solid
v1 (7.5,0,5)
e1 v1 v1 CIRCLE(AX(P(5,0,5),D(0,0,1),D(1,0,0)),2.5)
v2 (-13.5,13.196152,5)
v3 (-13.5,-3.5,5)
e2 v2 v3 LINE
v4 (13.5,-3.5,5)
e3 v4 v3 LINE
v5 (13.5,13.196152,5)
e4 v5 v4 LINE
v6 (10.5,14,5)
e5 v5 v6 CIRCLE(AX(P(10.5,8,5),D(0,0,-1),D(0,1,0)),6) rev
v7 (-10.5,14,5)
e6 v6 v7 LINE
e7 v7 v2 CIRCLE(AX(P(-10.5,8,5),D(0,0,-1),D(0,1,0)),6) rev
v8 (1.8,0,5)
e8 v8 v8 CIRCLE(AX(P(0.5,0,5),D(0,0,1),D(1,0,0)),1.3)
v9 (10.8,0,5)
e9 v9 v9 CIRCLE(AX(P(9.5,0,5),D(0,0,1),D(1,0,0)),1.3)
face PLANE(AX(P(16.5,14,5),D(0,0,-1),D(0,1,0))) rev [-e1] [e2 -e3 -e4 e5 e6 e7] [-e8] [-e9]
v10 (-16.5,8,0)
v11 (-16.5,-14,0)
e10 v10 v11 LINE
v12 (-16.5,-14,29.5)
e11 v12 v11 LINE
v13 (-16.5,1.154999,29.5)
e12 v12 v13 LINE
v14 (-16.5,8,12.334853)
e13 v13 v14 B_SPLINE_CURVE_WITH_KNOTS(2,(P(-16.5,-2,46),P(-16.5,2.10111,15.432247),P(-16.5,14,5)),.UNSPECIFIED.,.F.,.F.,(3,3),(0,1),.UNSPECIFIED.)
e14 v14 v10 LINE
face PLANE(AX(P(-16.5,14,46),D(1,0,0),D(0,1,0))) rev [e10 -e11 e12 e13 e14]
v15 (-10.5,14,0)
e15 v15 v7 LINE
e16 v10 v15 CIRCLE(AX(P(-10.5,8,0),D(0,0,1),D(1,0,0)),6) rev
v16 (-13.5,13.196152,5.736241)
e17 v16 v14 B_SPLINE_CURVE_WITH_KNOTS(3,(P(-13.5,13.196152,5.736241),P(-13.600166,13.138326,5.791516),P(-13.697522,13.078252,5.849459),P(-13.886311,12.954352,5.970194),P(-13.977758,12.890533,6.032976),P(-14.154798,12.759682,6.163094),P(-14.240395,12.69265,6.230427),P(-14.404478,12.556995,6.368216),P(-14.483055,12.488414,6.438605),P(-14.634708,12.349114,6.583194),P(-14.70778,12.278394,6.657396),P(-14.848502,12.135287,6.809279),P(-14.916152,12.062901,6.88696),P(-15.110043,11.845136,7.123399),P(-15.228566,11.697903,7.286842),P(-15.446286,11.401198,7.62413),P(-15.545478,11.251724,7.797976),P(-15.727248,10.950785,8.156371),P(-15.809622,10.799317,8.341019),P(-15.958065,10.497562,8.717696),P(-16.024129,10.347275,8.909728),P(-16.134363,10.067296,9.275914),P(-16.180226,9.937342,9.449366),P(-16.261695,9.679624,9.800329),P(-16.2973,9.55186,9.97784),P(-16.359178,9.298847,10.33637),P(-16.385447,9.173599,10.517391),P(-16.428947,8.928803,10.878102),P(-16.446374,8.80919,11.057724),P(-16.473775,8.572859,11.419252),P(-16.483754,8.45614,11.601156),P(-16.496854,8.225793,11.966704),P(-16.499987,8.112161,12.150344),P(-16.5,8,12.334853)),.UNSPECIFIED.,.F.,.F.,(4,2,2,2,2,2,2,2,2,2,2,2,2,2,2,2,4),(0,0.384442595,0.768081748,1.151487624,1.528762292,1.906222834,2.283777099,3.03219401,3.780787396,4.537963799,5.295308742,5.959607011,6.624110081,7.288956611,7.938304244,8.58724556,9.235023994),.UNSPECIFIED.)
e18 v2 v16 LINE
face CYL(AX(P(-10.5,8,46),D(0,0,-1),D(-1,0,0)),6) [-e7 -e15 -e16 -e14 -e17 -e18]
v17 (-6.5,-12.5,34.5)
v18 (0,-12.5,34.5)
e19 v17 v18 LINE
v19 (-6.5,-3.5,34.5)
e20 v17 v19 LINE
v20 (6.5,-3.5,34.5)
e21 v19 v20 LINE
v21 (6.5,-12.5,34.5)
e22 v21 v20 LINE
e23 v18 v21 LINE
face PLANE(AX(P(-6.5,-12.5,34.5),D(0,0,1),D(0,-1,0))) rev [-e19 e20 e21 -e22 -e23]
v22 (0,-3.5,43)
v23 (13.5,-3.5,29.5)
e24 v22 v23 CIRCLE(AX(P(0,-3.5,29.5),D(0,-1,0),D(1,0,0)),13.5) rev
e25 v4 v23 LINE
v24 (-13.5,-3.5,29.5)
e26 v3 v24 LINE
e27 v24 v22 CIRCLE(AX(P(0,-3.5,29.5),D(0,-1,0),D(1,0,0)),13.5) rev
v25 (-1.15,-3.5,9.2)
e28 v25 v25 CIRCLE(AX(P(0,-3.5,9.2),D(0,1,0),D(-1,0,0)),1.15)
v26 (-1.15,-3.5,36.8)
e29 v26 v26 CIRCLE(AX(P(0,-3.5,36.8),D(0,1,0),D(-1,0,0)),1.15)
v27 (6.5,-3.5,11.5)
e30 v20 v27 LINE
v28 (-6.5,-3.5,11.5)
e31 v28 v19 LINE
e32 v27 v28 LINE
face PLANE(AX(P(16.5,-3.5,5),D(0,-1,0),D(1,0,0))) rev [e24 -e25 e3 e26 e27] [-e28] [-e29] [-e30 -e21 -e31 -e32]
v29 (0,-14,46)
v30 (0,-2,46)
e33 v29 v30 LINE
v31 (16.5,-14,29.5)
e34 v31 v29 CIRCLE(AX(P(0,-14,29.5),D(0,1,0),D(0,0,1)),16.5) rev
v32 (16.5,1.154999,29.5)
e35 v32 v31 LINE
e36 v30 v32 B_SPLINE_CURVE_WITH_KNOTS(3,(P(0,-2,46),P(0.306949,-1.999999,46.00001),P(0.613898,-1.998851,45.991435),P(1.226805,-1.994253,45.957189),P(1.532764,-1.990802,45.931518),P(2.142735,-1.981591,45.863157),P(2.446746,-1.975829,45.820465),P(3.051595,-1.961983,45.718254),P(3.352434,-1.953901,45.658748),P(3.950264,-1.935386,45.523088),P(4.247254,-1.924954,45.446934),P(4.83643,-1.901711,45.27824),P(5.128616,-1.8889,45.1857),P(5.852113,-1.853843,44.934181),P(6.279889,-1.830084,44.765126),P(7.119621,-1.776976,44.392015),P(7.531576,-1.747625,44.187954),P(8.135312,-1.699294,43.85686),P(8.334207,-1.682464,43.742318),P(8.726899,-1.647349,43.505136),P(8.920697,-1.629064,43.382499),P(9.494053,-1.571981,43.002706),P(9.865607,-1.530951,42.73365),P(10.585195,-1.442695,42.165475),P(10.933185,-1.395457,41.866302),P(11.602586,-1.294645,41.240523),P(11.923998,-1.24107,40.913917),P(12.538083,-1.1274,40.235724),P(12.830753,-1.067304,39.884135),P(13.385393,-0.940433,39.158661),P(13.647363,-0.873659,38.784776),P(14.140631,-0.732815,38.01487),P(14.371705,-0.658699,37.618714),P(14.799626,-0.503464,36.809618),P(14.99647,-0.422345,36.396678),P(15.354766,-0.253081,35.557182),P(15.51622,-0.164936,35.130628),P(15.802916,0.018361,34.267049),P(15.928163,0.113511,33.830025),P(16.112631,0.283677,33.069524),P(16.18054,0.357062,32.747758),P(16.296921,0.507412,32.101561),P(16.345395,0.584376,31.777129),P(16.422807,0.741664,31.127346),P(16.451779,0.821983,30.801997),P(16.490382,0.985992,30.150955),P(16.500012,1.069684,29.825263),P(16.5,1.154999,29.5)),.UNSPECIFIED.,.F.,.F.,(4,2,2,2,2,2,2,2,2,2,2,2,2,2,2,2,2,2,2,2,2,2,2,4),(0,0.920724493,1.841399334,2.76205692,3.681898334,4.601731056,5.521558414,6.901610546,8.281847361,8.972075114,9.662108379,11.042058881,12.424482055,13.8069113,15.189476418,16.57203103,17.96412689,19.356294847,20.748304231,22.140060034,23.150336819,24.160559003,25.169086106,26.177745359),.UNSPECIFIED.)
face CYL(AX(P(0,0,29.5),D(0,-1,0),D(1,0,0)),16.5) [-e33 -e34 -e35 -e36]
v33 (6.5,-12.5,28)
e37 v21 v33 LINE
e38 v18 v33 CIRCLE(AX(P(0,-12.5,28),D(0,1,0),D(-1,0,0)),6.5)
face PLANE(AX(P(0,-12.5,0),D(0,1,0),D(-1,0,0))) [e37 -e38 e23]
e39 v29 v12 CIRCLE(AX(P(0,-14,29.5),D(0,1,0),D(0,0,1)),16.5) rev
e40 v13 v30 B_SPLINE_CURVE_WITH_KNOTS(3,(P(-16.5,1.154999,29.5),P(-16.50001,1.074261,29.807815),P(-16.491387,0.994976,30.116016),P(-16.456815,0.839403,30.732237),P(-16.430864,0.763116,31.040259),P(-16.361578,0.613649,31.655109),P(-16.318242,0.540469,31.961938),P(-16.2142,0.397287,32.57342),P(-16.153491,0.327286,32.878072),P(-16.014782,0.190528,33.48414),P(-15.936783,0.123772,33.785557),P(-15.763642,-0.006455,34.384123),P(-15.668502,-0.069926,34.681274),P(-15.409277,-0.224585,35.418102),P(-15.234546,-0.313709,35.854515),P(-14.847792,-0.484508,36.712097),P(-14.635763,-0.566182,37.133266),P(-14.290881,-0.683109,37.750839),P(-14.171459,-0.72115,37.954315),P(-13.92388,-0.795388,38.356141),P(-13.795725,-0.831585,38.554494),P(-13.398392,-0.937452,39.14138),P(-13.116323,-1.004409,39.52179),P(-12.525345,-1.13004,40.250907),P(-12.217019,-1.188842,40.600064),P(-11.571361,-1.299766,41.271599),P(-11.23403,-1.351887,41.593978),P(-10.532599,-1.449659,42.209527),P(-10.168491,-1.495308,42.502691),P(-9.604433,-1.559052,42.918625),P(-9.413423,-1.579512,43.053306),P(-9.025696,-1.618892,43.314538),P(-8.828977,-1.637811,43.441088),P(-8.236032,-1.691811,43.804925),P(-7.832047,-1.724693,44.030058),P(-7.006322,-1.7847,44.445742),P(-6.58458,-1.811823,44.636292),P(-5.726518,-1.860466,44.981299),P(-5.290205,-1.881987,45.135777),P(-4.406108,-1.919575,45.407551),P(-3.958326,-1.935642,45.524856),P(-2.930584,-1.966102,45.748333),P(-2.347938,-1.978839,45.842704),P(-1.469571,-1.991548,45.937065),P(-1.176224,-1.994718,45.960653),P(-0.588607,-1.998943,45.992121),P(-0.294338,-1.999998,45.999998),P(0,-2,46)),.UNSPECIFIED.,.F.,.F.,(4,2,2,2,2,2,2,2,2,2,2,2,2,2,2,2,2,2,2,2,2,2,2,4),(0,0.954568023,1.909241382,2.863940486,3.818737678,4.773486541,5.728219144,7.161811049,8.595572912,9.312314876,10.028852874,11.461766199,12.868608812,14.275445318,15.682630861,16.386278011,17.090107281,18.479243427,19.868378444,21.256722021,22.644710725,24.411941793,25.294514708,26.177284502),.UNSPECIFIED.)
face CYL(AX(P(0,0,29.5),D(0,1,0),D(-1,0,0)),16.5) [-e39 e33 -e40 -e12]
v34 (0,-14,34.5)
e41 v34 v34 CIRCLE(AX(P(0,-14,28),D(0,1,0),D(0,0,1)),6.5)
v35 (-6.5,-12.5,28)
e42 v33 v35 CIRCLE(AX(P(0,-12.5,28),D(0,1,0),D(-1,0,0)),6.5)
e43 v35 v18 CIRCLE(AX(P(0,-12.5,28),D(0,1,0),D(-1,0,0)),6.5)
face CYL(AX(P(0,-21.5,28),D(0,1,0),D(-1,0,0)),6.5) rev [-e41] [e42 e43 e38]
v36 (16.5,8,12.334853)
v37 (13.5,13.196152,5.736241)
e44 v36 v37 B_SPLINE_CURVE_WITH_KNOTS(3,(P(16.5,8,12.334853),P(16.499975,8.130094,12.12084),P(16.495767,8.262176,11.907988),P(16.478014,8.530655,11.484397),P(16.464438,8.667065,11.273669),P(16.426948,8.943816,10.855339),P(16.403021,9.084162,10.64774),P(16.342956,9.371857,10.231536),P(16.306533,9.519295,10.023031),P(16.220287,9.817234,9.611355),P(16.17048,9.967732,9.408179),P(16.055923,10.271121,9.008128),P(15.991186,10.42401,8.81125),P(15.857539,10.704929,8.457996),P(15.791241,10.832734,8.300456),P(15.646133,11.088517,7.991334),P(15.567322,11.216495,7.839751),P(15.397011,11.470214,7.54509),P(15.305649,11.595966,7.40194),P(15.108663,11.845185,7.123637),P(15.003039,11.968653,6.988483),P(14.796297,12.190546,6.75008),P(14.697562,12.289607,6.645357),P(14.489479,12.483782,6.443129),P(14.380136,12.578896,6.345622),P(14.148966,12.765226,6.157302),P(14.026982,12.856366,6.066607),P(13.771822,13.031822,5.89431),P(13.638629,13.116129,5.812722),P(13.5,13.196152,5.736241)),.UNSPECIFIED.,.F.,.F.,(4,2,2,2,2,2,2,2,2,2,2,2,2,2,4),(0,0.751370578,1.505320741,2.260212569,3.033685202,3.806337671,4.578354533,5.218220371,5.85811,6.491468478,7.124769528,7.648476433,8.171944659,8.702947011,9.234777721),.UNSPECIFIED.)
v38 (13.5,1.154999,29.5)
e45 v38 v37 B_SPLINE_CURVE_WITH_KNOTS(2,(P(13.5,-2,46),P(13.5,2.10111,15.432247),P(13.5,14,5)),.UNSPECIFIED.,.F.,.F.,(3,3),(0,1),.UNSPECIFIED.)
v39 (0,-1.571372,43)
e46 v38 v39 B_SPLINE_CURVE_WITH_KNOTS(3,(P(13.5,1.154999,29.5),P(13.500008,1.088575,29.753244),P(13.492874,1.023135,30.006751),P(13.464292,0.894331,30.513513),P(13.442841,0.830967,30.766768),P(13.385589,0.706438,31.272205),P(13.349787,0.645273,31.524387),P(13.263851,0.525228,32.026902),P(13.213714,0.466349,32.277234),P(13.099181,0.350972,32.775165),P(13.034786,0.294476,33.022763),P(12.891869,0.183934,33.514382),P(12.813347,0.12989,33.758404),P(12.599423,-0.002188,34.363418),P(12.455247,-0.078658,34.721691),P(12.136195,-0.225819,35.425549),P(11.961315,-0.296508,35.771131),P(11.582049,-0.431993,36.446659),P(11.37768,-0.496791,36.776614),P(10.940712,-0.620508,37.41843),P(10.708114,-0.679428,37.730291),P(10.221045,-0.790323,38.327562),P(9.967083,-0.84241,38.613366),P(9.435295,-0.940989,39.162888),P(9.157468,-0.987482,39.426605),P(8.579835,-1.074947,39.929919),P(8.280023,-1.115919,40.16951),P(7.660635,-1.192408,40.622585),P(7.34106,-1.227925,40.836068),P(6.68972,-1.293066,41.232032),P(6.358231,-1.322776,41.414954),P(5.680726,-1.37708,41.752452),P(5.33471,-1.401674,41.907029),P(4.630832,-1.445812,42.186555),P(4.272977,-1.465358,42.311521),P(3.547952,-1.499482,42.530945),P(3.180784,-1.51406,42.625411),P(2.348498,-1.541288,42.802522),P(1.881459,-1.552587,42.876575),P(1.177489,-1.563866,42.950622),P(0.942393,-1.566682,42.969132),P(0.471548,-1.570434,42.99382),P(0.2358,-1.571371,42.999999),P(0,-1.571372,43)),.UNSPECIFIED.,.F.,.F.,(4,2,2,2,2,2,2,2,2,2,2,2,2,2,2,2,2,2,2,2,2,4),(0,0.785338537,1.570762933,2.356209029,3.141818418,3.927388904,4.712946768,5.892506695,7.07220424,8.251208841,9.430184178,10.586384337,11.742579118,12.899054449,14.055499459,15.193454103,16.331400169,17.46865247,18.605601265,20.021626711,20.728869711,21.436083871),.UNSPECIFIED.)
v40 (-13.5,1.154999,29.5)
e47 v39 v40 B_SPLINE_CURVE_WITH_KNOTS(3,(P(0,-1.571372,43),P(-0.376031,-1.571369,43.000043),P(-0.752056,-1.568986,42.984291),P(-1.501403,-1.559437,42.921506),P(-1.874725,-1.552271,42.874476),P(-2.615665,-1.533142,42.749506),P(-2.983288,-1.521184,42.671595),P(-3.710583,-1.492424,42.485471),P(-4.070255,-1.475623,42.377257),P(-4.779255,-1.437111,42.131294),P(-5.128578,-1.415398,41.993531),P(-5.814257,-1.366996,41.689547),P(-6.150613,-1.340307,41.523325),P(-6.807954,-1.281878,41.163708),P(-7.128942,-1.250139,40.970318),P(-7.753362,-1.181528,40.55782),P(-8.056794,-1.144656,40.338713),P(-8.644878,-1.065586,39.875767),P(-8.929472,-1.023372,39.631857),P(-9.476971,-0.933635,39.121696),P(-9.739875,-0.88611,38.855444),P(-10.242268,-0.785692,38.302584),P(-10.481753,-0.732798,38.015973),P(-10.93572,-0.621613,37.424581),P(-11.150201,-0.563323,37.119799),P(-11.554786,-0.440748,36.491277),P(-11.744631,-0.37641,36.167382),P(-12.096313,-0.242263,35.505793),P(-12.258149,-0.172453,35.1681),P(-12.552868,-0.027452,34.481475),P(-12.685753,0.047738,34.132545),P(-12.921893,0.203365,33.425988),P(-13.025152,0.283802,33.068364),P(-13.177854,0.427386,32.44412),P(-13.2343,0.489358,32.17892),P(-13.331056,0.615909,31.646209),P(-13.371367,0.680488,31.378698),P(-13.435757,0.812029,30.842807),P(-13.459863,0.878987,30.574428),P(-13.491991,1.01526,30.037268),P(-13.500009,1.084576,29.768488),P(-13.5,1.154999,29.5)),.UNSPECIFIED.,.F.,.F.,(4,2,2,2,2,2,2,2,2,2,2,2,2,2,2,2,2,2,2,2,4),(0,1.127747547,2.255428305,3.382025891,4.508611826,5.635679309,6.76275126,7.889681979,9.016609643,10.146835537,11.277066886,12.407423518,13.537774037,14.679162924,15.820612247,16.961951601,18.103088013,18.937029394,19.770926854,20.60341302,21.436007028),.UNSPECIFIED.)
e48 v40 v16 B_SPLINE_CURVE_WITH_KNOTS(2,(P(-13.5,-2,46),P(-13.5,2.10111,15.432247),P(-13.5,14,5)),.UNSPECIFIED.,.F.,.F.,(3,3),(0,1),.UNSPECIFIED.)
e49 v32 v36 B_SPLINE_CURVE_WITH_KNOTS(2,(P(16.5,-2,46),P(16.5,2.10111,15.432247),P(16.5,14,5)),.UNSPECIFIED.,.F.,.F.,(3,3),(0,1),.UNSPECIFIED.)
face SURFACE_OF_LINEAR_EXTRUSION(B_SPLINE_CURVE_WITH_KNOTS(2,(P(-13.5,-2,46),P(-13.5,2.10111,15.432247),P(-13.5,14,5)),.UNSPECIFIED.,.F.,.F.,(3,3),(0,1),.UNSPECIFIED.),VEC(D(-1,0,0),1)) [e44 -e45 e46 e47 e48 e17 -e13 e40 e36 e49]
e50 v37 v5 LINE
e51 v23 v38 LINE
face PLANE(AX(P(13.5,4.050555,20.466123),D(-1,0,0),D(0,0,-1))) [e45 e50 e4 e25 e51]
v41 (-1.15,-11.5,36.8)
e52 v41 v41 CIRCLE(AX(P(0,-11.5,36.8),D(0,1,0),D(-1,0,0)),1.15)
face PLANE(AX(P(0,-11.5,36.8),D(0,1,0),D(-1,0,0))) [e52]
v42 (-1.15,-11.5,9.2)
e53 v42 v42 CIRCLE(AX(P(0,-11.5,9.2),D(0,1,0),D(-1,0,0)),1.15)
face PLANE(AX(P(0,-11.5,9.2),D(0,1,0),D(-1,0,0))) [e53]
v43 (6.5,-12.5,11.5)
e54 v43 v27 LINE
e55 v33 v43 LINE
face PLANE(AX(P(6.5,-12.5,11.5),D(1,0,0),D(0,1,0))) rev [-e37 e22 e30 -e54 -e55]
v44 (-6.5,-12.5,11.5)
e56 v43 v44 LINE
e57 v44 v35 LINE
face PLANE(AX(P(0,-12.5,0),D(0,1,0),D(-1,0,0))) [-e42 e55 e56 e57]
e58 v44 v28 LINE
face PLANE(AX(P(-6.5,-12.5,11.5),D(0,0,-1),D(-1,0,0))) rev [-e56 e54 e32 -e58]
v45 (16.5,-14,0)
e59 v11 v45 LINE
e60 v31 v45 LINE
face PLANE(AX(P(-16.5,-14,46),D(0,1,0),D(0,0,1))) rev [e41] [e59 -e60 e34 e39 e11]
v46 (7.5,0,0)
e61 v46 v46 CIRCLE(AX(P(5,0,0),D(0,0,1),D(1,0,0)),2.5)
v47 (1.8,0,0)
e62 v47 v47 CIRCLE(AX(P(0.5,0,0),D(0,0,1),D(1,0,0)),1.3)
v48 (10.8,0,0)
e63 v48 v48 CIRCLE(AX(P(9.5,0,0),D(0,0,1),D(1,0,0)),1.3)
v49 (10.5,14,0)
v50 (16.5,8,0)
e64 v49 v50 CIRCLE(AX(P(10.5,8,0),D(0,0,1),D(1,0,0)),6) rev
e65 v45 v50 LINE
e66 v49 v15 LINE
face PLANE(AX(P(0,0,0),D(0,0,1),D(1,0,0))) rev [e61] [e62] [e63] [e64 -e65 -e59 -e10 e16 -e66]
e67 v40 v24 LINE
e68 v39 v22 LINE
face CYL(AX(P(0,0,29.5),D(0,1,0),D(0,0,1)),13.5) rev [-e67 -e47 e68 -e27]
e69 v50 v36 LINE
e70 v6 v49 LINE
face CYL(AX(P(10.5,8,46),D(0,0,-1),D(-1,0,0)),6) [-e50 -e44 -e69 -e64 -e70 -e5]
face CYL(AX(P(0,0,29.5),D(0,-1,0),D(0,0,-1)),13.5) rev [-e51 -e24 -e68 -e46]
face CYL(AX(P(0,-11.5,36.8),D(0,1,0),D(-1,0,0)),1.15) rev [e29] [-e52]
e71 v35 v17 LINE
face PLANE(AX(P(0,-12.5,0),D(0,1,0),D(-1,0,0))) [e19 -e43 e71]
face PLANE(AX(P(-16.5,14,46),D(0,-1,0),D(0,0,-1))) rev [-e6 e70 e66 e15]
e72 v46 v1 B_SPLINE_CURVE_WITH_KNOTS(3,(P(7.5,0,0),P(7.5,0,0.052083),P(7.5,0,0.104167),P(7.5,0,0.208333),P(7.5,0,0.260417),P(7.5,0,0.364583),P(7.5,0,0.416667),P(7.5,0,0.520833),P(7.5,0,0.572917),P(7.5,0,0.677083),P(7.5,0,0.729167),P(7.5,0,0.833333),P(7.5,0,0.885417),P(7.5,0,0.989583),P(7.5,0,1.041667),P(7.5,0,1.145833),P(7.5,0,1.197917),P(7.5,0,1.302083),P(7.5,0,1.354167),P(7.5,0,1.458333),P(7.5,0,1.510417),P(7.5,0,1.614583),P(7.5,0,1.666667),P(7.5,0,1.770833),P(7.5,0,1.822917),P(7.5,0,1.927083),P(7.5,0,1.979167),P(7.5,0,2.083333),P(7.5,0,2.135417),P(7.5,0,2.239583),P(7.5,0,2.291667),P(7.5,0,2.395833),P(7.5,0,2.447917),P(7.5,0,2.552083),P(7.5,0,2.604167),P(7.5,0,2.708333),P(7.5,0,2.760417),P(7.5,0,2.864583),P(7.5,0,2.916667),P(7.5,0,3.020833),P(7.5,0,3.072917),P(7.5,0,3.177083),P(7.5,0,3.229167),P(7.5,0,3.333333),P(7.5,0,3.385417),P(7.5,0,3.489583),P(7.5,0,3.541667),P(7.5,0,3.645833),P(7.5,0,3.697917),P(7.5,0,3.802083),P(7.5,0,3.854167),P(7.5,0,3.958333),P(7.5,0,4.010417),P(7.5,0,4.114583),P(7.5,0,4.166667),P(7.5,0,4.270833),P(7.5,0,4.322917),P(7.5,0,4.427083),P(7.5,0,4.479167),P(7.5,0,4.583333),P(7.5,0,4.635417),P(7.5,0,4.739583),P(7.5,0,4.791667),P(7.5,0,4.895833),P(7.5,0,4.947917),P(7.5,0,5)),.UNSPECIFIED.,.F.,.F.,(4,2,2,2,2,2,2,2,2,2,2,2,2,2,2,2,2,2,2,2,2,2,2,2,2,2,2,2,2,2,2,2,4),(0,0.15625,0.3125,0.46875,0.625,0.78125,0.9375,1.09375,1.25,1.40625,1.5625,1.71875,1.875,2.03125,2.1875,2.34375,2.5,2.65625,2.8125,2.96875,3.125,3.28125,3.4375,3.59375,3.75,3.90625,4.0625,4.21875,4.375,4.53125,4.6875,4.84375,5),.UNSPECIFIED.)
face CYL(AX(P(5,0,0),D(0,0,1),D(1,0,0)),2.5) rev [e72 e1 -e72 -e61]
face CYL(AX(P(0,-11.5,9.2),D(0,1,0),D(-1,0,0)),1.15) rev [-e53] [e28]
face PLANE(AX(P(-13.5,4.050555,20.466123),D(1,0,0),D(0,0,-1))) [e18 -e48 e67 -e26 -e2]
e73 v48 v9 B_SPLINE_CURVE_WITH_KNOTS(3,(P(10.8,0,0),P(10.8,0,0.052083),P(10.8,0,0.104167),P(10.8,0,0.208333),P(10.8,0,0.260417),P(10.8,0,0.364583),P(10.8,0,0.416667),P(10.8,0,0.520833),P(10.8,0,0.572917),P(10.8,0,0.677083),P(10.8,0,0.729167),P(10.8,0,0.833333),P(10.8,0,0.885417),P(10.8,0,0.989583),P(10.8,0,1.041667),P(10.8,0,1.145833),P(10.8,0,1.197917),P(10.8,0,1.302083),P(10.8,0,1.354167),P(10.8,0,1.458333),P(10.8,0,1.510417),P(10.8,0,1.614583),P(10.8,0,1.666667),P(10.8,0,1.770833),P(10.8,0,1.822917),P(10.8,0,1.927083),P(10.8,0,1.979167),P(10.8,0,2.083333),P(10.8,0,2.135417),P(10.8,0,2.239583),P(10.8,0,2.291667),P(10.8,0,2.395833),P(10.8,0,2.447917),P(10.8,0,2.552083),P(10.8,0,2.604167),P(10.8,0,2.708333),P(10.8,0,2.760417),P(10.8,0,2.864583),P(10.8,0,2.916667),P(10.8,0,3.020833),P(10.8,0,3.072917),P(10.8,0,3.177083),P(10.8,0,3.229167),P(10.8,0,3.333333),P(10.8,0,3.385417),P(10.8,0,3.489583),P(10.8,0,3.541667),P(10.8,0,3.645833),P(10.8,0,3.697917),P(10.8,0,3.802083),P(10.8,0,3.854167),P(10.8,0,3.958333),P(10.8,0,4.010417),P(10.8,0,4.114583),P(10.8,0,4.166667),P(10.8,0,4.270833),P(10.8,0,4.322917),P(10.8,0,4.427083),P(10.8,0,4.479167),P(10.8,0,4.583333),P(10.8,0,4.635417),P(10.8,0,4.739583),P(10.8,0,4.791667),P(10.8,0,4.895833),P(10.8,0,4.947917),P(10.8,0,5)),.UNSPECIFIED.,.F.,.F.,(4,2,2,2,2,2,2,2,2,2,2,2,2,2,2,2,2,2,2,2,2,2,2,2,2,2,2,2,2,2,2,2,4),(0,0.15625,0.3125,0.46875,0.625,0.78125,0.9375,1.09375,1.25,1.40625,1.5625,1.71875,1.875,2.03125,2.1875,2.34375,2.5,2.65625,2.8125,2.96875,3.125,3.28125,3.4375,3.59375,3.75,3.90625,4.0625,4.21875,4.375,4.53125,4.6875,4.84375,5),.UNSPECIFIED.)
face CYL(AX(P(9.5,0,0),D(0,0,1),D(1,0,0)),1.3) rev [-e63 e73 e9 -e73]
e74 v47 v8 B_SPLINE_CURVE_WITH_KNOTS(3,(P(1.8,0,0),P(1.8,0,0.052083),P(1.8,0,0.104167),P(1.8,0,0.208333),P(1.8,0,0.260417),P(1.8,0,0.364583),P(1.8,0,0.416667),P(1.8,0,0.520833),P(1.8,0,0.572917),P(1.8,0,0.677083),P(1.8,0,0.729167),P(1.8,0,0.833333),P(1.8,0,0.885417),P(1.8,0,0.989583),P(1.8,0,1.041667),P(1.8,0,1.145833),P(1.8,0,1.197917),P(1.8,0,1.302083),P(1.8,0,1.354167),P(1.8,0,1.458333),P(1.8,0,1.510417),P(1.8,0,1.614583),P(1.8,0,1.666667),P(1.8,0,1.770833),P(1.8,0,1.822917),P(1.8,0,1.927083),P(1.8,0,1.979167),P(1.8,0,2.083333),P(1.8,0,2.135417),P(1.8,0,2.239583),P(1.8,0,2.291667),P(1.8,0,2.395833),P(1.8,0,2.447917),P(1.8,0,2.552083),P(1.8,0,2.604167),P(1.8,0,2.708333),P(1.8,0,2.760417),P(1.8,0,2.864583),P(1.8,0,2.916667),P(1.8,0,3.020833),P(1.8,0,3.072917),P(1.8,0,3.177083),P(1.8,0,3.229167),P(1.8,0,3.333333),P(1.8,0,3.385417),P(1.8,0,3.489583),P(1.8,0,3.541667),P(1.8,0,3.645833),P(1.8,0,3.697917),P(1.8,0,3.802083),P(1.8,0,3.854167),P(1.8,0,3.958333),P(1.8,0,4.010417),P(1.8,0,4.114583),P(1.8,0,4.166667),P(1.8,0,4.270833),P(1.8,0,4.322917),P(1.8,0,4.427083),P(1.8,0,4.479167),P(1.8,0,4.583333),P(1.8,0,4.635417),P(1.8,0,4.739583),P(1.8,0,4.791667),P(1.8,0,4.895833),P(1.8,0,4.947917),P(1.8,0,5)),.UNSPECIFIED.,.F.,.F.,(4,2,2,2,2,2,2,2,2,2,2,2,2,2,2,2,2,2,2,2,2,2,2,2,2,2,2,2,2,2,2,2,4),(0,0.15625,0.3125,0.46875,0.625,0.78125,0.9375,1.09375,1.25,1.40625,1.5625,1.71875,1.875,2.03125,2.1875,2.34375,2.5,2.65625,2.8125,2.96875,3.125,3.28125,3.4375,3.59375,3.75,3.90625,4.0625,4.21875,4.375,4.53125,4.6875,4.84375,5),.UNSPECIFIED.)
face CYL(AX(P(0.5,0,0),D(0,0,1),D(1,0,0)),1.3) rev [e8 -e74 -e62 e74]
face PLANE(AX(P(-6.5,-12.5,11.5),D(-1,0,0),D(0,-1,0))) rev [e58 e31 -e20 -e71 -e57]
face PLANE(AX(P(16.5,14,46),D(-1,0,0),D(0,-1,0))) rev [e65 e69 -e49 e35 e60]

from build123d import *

# Parameters (mm, degrees)
SKETCH2_W               = 33
SKETCH2_H               = 28
BOSS_EXTRUDE1_DEPTH     = 46
CUT_EXTRUDE1_DEPTH      = 59.318093247
CUT_EXTRUDE1_DEPTH_BACK = 59.318093247
SKETCH3_W               = 41
SKETCH3_H               = 17.5
BOSS_EXTRUDE2_DEPTH     = 3
BOSS_EXTRUDE3_DEPTH     = 27
FILLET2_START           = -3.5
FILLET2_DEPTH           = 4.654998639
FILLET2_START_2         = -13.5
FILLET2_2_DEPTH         = 27
FILLET3_R               = 16.5
FILLET4_R               = 6
SKETCH6_W               = 13
SKETCH6_H               = 23
CUT_EXTRUDE2_DEPTH      = 9
SKETCH7_R               = 6.5
CUT_EXTRUDE3_DEPTH      = 9
SKETCH8_R               = 1.15
CUT_EXTRUDE4_DEPTH      = 8
SKETCH9_R               = 1.3
SKETCH9_R_2             = 2.5
CUT_EXTRUDE5_DEPTH      = 47.360004954


with BuildPart() as part:
    # Sketch2 → Boss-Extrude1 (new body)
    with BuildSketch(Plane.XY):
        Rectangle(SKETCH2_W, SKETCH2_H)
    extrude(amount=BOSS_EXTRUDE1_DEPTH)

    # Sketch3 → Cut-Extrude1 (cut, two sides: drawn at the far end of the back side and taken through both)
    with BuildSketch(Plane.ZY.offset(16.5).offset(-CUT_EXTRUDE1_DEPTH_BACK)):
        with Locations((25.5, 5.25)):
            Rectangle(SKETCH3_W, SKETCH3_H)
    extrude(amount=CUT_EXTRUDE1_DEPTH + CUT_EXTRUDE1_DEPTH_BACK, mode=Mode.SUBTRACT)

    # Sketch4 → Boss-Extrude2 (add)
    with BuildSketch(Plane.ZY.offset(16.5)):
        with BuildLine():
            Line((46, -2), (46, -3.5))
            Line((46, -3.5), (5, -3.5))
            Line((5, -3.5), (5, 14))
            add(Edge.make_bspline(
                [(5, 14), (15.432246661, 2.101110375), (46, -2)],
                knots=[0, 0, 0, 1, 1, 1], degree=2))
        make_face()
    boss_extrude2 = extrude(amount=-BOSS_EXTRUDE2_DEPTH)

    # Mirror1: Boss-Extrude2 across plane
    add(boss_extrude2.mirror(Plane(origin=(0, 0, 0), x_dir=(0, 0, 1), z_dir=(1, 0, 0))))

    # Sketch5 → Boss-Extrude3 (add)
    with BuildSketch(Plane(origin=(-13.5, 0, 0), x_dir=(0, 0, -1), z_dir=(1, 0, 0))):
        with BuildLine():
            Line((-46, -3.5), (-43, -3.5))
            Line((-43, -3.5), (-43, -1.57137225))
            add(Edge.make_bspline(
                [(-43, -1.57137225), (-44.474940132, -1.795390955), (-46.000000067, -2.000000009)],
                knots=[0.950108864, 0.950108864, 0.950108864, 1, 1, 1], degree=2))
            Line((-46.000000067, -2.000000009), (-46, -3.5))
        make_face()
    extrude(amount=BOSS_EXTRUDE3_DEPTH)

    # Fillet2: read off the stored shape, not the designer's step
    # Fillet2 outline → Fillet2 (add)
    with BuildSketch(Plane(origin=(0, 0, 0), x_dir=(1, 0, 0), z_dir=(0, 1.0, -9.82210297214819e-12)).offset(FILLET2_START)):
        with BuildLine():
            Line((13.5, -43.00000001), (13.5, -29.5))
            ThreePointArc((13.5, -29.5), (9.545941546, -39.045941546), (0, -43))
            Line((0, -43), (13.5, -43.00000001))
        make_face()
        with BuildLine():
            Line((-13.5, -43), (0, -43))
            ThreePointArc((0, -43), (-9.545941546, -39.045941546), (-13.5, -29.5))
            Line((-13.5, -29.5), (-13.5, -43))
        make_face()
    extrude(amount=FILLET2_DEPTH)

    # Fillet2 2 outline → Fillet2 2 (cut)
    with BuildSketch(Plane.YZ.offset(FILLET2_START_2)):
        with BuildLine():
            Line((1.154998639, 43.000000001), (-1.57137225, 43.000000001))
            add(Edge.make_bspline(
                [(-1.57137225, 43.000000001), (-0.450949941, 35.623134616), (1.154998546, 29.499999976)],
                knots=[0.049891135, 0.049891135, 0.049891135, 0.299420037, 0.299420037, 0.299420037], degree=2))
            Line((1.154998546, 29.499999976), (1.154998639, 43.000000001))
        make_face()
    extrude(amount=FILLET2_2_DEPTH, mode=Mode.SUBTRACT)

    # Fillet3
    # the kernel refuses this fillet: 16.5 mm, written as the material it takes off along each edge
    with BuildSketch(Plane(origin=(-16.5, -55.25, 46), x_dir=(0, 0, -1), z_dir=(0, 1, 0)), Plane(origin=(16.5, 39.25, 46), x_dir=(0, 0, -1), z_dir=(0, -1, 0))) as fillet3_piece_1:
        with BuildLine():
            CenterArc((FILLET3_R, -FILLET3_R), FILLET3_R, 90, 90)
            Line((0, -FILLET3_R), (0, 0))
            Line((0, 0), (FILLET3_R, 0))
        make_face()
    extrude(amount=94.5, mode=Mode.SUBTRACT)

    # Fillet4
    # the kernel refuses this fillet: 6 mm, written as the material it takes off along each edge
    with BuildSketch(Plane(origin=(-16.5, 14, -15), x_dir=(1, 0, 0), z_dir=(0, 0, 1))) as fillet4_piece_1:
        with BuildLine():
            CenterArc((FILLET4_R, -FILLET4_R), FILLET4_R, 90, 90)
            Line((0, -FILLET4_R), (0, 0))
            Line((0, 0), (FILLET4_R, 0))
        make_face()
    extrude(amount=35, mode=Mode.SUBTRACT)
    with BuildSketch(Plane(origin=(16.5, 14, -15), x_dir=(-1, 0, 0), z_dir=(0, 0, 1))) as fillet4_piece_2:
        with BuildLine():
            CenterArc((FILLET4_R, FILLET4_R), FILLET4_R, 180, 90)
            Line((0, FILLET4_R), (0, 0))
            Line((0, 0), (FILLET4_R, 0))
        make_face()
    extrude(amount=35, mode=Mode.SUBTRACT)

    # Sketch6 → Cut-Extrude2 (cut)
    with BuildSketch(Plane(origin=(0, -3.5, 0), x_dir=(1, 0, 0), z_dir=(0, 1, 0))):
        with Locations((0, -23)):
            Rectangle(SKETCH6_W, SKETCH6_H)
    extrude(amount=-CUT_EXTRUDE2_DEPTH, mode=Mode.SUBTRACT)

    # Sketch7 → Cut-Extrude3 (cut)
    with BuildSketch(Plane(origin=(0, -12.5, 0), x_dir=(1, 0, 0), z_dir=(0, 1, 0))):
        with Locations(Location((0, -28, 0), (0, 0, 270))):
            Circle(SKETCH7_R)
    extrude(amount=-CUT_EXTRUDE3_DEPTH, mode=Mode.SUBTRACT)

    # Sketch8 → Cut-Extrude4 (cut)
    with BuildSketch(Plane(origin=(0, -3.5, 0), x_dir=(1, 0, 0), z_dir=(0, 1, 0))):
        with Locations(Location((0, -9.2, 0), (0, 0, 180))):
            Circle(SKETCH8_R)
        with Locations(Location((0, -36.8, 0), (0, 0, 180))):
            Circle(SKETCH8_R)
    extrude(amount=-CUT_EXTRUDE4_DEPTH, mode=Mode.SUBTRACT)

    # Sketch9 → Cut-Extrude5 (cut, through all)
    with BuildSketch(Plane.XY.offset(5)):
        with Locations((0.5, 0)):
            Circle(SKETCH9_R)
        with Locations((5, 0)):
            Circle(SKETCH9_R_2)
        with Locations((9.5, 0)):
            Circle(SKETCH9_R)
    extrude(amount=-CUT_EXTRUDE5_DEPTH, mode=Mode.SUBTRACT)


solid = part.part
